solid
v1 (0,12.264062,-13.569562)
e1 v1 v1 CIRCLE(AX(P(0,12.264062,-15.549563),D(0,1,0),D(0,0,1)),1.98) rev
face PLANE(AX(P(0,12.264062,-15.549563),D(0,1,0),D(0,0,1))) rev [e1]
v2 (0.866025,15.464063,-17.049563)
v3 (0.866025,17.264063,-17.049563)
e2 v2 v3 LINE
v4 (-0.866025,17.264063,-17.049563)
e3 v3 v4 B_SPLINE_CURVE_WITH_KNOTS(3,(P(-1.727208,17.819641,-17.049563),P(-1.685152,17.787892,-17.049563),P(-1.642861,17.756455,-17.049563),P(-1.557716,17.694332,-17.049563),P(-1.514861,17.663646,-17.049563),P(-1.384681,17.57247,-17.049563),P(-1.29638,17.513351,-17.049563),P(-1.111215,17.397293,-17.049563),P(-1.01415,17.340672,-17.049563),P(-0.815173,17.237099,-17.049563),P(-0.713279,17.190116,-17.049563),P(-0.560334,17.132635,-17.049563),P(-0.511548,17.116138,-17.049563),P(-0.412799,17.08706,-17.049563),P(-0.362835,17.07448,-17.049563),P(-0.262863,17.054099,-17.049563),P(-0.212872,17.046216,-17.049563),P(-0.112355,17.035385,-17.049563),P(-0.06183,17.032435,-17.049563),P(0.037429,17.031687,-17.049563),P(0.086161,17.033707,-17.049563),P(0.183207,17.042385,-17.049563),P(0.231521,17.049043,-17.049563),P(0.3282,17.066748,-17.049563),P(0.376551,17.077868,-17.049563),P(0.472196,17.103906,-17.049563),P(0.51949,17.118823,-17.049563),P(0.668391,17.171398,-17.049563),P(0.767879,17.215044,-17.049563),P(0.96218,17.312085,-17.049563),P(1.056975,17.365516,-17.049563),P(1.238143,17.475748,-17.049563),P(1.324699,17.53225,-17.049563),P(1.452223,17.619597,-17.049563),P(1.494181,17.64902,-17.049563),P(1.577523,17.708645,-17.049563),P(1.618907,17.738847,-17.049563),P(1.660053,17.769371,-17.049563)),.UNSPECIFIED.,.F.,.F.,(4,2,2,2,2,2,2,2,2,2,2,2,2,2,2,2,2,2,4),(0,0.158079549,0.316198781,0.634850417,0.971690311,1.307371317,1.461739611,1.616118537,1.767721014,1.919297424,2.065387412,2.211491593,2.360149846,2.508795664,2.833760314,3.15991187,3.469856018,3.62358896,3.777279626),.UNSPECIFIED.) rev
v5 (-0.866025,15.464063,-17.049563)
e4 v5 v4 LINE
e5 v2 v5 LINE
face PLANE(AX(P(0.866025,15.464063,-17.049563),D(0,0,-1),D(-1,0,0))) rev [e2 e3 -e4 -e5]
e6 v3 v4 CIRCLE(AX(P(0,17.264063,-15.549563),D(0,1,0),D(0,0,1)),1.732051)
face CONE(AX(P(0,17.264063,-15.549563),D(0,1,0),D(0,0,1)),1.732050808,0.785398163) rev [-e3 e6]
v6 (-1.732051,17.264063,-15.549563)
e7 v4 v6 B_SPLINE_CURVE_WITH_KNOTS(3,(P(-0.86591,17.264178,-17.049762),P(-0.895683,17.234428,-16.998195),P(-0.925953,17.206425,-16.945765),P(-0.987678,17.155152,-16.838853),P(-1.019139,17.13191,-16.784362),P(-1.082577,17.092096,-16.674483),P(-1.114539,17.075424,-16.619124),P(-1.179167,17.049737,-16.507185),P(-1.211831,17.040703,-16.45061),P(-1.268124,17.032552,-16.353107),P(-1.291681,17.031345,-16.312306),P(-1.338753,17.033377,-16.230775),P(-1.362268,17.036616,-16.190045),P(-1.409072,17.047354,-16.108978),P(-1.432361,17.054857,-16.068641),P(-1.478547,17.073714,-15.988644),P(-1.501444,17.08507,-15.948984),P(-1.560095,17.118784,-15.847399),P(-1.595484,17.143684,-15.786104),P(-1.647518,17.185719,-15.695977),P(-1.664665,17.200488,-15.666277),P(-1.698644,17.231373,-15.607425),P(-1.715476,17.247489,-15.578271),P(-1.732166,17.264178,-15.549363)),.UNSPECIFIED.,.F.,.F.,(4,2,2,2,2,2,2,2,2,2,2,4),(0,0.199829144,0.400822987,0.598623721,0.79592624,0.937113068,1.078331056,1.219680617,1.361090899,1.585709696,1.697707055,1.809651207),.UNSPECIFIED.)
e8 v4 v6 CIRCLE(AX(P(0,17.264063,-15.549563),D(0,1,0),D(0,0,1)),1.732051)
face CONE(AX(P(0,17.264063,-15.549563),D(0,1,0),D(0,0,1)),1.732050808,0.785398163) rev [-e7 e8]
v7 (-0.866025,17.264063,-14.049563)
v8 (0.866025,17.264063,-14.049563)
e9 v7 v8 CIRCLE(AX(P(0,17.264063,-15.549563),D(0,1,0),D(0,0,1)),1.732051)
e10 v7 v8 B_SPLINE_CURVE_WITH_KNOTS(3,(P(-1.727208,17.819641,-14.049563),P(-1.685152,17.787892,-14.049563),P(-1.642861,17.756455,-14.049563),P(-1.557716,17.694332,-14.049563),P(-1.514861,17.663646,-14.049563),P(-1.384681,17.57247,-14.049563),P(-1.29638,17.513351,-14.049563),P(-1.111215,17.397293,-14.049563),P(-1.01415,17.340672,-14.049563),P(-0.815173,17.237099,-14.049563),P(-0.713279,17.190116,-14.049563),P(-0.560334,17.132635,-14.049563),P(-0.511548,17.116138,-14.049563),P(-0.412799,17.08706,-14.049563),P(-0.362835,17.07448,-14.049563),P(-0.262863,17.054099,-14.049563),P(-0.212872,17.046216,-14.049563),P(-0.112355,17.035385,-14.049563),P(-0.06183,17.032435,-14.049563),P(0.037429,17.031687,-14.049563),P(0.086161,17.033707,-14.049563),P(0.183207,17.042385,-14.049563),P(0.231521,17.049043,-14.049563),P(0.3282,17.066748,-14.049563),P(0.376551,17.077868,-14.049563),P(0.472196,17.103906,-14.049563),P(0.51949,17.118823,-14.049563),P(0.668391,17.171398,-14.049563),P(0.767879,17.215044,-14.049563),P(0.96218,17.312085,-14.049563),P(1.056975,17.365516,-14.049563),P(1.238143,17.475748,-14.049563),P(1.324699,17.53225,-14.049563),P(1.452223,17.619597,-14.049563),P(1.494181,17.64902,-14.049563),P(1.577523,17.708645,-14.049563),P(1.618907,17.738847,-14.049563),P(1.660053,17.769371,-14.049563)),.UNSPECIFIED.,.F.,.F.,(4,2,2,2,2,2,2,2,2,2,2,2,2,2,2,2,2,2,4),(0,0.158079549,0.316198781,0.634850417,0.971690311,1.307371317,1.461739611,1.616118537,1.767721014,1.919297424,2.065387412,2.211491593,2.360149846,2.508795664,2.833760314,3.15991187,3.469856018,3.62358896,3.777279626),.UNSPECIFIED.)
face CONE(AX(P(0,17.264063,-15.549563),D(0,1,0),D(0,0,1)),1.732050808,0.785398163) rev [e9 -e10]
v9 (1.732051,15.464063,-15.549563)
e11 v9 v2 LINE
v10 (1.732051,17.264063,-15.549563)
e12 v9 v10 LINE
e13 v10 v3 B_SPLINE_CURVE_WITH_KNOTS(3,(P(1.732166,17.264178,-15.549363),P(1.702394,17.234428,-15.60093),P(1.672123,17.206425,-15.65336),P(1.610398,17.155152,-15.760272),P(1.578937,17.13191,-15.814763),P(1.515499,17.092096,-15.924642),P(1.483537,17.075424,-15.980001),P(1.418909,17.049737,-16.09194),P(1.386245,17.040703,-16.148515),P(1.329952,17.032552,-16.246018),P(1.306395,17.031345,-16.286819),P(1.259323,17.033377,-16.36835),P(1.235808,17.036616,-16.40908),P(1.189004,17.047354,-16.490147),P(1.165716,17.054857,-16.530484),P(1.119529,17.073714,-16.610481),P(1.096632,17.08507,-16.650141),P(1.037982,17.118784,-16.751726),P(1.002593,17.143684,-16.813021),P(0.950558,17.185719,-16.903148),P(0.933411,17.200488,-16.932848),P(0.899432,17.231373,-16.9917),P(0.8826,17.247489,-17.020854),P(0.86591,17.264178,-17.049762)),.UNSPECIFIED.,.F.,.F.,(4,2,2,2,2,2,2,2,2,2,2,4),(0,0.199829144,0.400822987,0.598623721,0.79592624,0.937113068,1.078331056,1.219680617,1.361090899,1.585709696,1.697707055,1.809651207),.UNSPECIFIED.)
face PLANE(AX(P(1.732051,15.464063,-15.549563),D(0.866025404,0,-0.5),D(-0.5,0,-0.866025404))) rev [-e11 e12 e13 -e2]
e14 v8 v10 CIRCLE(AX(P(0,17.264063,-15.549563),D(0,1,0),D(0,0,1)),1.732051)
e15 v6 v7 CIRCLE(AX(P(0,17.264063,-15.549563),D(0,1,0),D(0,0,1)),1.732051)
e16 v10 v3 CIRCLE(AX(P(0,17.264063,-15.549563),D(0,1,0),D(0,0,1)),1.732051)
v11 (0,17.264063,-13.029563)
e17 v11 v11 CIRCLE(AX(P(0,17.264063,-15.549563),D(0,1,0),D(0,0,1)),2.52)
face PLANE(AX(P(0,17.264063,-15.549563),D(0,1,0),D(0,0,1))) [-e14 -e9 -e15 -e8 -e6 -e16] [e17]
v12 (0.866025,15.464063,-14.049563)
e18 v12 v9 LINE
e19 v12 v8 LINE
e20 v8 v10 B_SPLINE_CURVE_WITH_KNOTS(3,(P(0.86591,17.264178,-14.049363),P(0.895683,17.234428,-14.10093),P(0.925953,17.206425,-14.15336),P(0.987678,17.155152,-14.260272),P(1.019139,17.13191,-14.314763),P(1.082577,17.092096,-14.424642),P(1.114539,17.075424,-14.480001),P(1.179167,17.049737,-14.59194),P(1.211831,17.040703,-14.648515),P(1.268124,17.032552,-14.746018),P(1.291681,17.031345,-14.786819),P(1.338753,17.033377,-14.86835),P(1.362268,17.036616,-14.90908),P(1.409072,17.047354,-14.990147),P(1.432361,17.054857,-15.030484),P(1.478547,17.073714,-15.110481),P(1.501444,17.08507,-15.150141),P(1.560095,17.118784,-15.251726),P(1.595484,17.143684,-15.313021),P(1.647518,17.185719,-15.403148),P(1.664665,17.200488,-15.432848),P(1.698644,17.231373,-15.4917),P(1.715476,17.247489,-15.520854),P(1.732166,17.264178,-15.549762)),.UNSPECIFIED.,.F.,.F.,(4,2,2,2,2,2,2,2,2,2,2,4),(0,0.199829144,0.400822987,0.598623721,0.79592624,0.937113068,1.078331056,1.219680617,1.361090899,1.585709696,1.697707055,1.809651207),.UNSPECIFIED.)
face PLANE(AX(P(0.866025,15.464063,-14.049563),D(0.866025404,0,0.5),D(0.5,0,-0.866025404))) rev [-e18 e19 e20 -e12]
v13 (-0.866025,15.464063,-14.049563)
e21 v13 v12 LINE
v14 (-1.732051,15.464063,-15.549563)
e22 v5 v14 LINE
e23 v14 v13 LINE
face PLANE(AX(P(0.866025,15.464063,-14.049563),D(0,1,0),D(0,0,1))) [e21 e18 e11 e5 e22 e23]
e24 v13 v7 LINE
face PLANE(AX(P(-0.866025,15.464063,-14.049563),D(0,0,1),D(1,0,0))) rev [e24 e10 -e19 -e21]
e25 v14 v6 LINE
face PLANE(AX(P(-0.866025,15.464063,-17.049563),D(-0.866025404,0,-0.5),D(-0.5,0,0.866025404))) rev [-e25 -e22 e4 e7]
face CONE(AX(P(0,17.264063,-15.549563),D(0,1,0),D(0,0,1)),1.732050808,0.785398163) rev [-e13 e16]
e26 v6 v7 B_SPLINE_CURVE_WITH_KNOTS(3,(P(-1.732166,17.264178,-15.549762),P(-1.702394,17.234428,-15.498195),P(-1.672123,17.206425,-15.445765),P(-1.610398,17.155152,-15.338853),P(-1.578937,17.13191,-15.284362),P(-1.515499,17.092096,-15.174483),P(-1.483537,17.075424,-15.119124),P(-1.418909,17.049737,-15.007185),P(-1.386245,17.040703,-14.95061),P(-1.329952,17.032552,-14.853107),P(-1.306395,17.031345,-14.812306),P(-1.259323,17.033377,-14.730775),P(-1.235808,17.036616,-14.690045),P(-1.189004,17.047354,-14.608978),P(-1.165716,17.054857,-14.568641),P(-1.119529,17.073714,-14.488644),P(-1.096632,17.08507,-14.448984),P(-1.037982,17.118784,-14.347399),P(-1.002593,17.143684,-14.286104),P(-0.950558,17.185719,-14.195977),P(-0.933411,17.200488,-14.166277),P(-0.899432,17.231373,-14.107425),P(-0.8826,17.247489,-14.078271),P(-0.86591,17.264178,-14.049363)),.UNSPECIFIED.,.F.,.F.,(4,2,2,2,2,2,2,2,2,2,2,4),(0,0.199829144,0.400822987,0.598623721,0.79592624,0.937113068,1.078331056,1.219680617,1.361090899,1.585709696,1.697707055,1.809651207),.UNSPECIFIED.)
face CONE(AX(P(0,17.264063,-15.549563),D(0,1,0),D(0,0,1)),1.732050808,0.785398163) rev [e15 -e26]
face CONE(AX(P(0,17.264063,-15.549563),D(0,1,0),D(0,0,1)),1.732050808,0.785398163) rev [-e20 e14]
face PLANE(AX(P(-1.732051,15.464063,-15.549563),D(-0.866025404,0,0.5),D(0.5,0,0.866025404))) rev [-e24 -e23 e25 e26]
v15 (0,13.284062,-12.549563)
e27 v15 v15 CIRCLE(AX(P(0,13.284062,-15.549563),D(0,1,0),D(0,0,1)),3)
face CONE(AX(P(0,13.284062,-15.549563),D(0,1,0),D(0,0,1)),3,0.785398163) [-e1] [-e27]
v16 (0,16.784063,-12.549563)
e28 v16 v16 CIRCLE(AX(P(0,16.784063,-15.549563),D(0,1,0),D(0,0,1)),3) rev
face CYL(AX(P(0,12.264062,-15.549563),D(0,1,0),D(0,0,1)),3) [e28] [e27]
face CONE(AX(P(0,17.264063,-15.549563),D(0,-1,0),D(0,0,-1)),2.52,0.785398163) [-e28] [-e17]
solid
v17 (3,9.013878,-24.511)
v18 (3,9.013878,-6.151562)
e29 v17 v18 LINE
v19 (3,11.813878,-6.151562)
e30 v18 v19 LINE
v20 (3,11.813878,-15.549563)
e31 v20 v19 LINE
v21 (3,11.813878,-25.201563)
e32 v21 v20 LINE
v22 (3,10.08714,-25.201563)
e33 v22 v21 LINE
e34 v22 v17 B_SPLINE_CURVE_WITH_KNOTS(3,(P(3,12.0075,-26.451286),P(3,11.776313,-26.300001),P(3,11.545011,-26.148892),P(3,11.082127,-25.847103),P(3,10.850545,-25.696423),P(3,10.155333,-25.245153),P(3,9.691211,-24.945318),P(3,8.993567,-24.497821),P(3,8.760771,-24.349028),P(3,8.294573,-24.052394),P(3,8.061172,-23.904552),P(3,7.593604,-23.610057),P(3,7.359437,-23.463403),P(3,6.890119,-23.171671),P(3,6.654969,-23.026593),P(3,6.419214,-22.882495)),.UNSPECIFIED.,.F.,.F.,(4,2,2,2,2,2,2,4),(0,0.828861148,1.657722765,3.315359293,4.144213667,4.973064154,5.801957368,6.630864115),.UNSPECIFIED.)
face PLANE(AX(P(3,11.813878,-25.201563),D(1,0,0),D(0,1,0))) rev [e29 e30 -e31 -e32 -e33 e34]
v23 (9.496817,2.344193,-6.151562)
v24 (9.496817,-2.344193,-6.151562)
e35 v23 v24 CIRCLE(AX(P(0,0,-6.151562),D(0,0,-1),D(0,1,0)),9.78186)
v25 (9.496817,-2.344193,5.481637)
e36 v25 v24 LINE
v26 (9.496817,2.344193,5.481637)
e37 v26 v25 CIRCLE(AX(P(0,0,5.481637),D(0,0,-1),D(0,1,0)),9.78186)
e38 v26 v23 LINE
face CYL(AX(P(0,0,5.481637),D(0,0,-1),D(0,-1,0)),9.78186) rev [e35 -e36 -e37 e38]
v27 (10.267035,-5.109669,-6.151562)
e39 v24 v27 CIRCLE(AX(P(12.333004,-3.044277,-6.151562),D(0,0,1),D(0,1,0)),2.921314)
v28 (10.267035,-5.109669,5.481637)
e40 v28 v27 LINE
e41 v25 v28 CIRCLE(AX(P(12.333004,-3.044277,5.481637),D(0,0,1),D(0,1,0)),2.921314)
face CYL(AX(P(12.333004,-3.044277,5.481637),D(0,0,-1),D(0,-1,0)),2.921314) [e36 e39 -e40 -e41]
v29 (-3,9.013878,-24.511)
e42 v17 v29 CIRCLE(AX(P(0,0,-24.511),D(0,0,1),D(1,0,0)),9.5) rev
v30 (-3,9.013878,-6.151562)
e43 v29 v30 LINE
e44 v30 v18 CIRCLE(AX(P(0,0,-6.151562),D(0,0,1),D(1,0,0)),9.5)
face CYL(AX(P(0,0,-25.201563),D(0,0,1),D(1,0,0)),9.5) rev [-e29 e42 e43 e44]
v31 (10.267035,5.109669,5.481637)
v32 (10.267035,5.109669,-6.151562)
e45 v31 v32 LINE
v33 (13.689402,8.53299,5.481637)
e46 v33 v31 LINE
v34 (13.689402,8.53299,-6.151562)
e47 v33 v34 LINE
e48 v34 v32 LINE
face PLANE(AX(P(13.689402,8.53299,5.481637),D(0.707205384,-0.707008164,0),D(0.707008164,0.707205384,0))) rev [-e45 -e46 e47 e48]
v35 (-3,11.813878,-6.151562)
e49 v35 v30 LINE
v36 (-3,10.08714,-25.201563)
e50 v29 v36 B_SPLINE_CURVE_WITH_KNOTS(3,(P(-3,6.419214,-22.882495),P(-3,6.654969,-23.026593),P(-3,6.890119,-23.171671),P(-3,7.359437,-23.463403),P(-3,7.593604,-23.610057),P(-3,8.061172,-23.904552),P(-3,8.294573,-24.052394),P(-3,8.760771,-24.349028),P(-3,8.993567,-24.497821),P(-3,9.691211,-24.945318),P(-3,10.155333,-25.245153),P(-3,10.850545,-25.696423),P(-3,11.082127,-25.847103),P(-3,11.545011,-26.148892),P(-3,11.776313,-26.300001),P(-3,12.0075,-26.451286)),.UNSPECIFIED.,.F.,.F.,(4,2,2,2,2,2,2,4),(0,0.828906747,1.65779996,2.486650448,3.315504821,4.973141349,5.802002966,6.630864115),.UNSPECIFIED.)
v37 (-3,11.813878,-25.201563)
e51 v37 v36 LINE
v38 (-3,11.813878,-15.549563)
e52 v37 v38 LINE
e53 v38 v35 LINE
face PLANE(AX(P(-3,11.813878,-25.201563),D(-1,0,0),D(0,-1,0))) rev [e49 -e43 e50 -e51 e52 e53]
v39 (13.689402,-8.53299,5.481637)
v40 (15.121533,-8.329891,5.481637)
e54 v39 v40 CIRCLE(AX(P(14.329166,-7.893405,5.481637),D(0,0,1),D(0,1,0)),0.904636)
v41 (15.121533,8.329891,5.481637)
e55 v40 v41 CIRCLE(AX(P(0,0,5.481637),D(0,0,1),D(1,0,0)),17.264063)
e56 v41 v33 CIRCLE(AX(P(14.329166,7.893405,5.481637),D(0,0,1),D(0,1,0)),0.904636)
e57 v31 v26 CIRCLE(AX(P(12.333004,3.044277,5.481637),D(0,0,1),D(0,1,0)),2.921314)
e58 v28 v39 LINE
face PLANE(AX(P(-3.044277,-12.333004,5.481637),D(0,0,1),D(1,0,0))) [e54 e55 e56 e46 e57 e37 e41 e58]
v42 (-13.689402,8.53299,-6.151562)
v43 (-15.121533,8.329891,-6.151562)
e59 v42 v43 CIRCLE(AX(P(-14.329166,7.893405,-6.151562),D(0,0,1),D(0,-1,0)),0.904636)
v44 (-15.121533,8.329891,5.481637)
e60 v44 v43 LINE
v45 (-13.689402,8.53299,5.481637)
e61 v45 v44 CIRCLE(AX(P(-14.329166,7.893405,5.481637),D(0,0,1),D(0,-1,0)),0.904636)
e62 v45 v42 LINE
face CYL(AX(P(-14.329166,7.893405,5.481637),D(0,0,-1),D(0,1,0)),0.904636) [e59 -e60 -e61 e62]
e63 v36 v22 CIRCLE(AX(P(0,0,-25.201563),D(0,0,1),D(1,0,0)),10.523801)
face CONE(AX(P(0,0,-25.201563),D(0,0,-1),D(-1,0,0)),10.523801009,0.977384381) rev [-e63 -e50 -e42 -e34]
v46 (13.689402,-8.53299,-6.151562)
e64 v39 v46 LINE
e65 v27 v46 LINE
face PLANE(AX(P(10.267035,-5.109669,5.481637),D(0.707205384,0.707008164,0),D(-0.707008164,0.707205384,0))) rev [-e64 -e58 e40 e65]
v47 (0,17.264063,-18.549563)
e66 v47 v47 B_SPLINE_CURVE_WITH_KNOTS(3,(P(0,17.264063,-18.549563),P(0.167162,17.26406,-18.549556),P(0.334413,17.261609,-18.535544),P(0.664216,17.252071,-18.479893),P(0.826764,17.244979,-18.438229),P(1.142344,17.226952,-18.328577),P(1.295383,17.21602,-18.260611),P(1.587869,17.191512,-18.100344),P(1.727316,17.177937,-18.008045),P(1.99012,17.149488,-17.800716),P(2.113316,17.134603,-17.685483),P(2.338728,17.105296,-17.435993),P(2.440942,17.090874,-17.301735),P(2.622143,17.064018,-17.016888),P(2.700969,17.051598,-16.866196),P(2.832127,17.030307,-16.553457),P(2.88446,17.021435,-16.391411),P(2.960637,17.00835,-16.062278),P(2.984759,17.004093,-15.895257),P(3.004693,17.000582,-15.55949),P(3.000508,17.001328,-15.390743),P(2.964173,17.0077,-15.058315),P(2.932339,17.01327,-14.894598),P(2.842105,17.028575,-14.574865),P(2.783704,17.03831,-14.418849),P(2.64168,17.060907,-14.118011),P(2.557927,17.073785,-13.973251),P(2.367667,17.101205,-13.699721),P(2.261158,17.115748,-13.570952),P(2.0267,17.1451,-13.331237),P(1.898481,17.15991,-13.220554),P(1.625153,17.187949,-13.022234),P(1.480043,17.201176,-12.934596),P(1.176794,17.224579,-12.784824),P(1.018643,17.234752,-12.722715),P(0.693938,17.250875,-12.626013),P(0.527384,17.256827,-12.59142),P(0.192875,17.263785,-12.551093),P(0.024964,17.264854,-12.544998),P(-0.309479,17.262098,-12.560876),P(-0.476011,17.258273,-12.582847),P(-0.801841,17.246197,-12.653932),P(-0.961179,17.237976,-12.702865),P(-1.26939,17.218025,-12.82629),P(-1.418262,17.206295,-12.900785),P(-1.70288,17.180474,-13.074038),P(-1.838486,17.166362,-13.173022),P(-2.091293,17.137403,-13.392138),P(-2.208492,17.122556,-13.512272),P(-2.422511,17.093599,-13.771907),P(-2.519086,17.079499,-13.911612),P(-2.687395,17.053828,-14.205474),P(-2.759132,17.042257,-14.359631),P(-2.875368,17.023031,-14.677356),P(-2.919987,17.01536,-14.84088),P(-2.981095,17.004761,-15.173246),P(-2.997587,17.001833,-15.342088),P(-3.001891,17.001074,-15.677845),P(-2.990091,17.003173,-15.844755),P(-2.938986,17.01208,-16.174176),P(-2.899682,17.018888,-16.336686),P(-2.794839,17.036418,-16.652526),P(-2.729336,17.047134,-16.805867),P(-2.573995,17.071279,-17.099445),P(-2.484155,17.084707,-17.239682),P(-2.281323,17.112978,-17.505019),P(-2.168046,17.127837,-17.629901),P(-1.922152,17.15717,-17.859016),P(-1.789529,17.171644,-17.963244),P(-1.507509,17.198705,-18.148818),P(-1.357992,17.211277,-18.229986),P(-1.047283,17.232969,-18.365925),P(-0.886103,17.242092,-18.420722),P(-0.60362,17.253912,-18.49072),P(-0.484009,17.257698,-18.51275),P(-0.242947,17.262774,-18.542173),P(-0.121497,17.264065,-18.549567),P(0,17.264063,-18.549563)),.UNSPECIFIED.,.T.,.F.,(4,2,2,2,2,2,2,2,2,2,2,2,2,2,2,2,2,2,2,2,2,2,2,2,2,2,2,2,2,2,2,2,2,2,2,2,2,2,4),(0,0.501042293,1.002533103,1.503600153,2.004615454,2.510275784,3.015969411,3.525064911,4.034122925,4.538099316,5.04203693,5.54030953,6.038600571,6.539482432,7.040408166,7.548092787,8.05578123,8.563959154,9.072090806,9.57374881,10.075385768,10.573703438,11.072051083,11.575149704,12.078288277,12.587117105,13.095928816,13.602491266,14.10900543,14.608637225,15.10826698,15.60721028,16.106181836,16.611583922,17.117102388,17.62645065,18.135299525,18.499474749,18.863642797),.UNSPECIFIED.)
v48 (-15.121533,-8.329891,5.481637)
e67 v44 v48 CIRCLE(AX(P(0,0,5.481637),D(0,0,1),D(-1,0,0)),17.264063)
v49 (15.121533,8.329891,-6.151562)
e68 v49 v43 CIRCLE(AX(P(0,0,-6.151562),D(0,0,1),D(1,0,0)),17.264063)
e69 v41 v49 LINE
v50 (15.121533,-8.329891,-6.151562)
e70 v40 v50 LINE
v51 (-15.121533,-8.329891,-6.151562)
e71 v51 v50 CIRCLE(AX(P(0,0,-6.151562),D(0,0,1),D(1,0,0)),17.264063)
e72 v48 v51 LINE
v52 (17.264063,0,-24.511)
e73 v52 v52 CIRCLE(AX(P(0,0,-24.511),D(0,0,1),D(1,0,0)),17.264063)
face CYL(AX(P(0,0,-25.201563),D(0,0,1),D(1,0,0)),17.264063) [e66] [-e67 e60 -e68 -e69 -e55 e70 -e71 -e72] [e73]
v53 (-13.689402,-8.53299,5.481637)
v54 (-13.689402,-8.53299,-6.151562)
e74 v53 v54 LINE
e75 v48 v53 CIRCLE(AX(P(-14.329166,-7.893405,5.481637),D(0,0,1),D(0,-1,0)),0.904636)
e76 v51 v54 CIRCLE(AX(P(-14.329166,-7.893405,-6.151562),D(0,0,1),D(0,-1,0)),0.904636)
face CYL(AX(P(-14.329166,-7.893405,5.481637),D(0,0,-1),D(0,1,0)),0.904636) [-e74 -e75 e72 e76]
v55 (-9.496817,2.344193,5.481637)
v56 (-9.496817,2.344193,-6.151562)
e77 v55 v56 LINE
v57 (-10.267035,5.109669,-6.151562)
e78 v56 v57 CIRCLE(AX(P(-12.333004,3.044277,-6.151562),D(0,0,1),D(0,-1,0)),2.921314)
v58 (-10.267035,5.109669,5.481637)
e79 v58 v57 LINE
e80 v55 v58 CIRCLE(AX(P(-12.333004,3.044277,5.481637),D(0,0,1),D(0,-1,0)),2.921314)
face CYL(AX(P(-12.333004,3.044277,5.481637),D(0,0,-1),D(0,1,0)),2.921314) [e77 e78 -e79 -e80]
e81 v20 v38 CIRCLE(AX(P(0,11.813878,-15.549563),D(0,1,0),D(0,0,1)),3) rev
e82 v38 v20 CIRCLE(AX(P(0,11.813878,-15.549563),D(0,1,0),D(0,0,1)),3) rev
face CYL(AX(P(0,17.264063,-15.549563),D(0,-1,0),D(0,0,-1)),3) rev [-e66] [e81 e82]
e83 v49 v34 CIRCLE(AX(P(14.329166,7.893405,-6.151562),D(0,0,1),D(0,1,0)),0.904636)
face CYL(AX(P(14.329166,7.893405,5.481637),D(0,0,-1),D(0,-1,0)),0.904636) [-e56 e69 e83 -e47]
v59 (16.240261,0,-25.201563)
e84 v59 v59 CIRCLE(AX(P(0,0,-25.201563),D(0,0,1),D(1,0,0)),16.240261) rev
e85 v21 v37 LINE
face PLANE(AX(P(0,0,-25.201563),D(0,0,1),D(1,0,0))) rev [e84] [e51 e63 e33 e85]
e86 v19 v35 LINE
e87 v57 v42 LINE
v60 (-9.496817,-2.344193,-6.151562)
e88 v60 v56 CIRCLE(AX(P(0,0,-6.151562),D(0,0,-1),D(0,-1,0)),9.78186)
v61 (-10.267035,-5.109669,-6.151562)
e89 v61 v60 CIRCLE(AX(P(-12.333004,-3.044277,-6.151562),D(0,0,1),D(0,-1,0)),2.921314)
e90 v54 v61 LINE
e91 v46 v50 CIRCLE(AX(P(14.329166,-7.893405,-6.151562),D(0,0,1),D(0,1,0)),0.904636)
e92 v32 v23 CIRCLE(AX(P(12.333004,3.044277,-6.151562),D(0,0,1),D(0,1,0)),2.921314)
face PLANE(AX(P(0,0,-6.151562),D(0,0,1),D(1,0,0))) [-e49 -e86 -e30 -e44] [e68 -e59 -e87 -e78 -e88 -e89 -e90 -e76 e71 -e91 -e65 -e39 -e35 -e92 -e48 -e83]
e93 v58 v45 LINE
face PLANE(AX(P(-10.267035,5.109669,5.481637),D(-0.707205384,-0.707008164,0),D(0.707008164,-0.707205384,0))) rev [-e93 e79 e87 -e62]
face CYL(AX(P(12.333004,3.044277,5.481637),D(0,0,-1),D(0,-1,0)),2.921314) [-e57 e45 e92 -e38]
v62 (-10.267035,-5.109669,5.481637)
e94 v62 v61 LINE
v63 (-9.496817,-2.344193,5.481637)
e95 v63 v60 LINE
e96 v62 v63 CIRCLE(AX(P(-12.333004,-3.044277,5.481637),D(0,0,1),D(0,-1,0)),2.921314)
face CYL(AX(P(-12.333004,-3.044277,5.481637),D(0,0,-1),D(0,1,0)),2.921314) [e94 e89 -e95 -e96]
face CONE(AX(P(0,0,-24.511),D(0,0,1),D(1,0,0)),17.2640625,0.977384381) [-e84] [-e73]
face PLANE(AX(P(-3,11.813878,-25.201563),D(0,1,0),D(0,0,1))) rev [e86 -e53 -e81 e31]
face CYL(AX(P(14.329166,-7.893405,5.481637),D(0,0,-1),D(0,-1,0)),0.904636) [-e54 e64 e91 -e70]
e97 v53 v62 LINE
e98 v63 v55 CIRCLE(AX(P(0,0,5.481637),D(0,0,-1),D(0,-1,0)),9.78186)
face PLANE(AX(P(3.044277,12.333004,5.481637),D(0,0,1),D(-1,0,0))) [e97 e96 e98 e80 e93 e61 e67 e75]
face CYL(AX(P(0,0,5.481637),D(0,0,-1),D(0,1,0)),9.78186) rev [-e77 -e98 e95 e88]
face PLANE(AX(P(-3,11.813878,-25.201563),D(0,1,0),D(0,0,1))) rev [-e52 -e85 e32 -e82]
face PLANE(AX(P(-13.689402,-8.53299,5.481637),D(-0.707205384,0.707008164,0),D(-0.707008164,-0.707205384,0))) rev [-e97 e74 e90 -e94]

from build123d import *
from OCP.BRepFilletAPI import BRepFilletAPI_MakeChamfer
from build123d.topology import SkipClean

# Parameters (mm, degrees)
BOSS_EXTRUDE1_START     = -6.151562
SKETCH1_R               = 17.264063
BOSS_EXTRUDE1_DEPTH     = 19.050001
BOSS_EXTRUDE6_START     = 11.6332
BOSS_EXTRUDE6_DEPTH     = 11.6332
MOVE_START              = -6.151562
MOVE_FACE2_DEPTH        = 11.6332
MOVE_FACE2_2_DEPTH      = 11.6332
CIRPATTERN4_START       = -6.151562
CIRPATTERN4_DEPTH       = 11.6332
CUT_EXTRUDE5_DEPTH      = 36.088666
CUT_EXTRUDE5_DEPTH_BACK = 36.088666
SKETCH15_R              = 9.5
CHAMFER1_SIZE           = 0.690562
CHAMFER1_SIZE2          = 1.023801
CUT_EXTRUDE1_DEPTH      = 36.088666
CUT_EXTRUDE1_DEPTH_BACK = 36.088666
SKETCH5_R               = 3
CUT_EXTRUDE2_DEPTH      = 36.088666
SKETCH6_R               = 3
BOSS_EXTRUDE3_DEPTH     = 5
CUT_EXTRUDE3_DEPTH      = 1.8
CHAMFER3_SIZE           = 0.48
CHAMFER4_SIZE           = 1.02


# Read off the part's stored shape, not the designer's step: Move Face2, CirPattern4
with BuildPart() as part:
    # Sketch1 → Boss-Extrude1 (new body)
    with BuildSketch(Plane.XY.offset(BOSS_EXTRUDE1_START)):
        Circle(SKETCH1_R)
    extrude(amount=-BOSS_EXTRUDE1_DEPTH)

    # Sketch12 → Boss-Extrude6 (add)
    with SkipClean():  # the faces are left unmerged after this step: merging them gives an invalid solid
        with BuildSketch(Plane.XY.offset(-6.151562).offset(BOSS_EXTRUDE6_START)):
            with BuildLine():
                Line((-5.109669, -10.267035), (-8.53299, -13.689402))
                ThreePointArc((-8.53299, -13.689402), (-8.789079, -14.456186), (-8.329891, -15.121533))
                ThreePointArc((-8.329891, -15.121533), (0, -17.264062), (8.329891, -15.121533))
                ThreePointArc((8.329891, -15.121533), (8.789079, -14.456186), (8.53299, -13.689402))
                Line((8.53299, -13.689402), (5.109669, -10.267035))
                ThreePointArc((5.109669, -10.267035), (3.828066, -9.5188), (2.344193, -9.496817))
                ThreePointArc((2.344193, -9.496817), (0, -9.78186), (-2.344193, -9.496817))
                ThreePointArc((-2.344193, -9.496817), (-3.828066, -9.5188), (-5.109669, -10.267035))
            make_face()
        extrude(amount=-BOSS_EXTRUDE6_DEPTH)

    # Move Face2 outline → Move Face2 (cut)
    with BuildSketch(Plane.XY.offset(MOVE_START)):
        with BuildLine():
            ThreePointArc((-8.329891, -15.121533), (0, -17.264063), (8.329891, -15.121533))
            ThreePointArc((8.329891, -15.121533), (8.789079, -14.456186), (8.53299, -13.689402))
            Line((8.53299, -13.689402), (5.109669, -10.267035))
            ThreePointArc((5.109669, -10.267035), (3.828066, -9.5188), (2.344193, -9.496817))
            ThreePointArc((2.344193, -9.496817), (0, -9.78186), (-2.344193, -9.496817))
            ThreePointArc((-2.344193, -9.496817), (-3.828066, -9.5188), (-5.109669, -10.267035))
            Line((-5.109669, -10.267035), (-8.53299, -13.689402))
            ThreePointArc((-8.53299, -13.689402), (-8.789079, -14.456186), (-8.329891, -15.121533))
        make_face()
    extrude(amount=MOVE_FACE2_DEPTH, mode=Mode.SUBTRACT)

    # Move Face2 2 outline → Move Face2 2 (add)
    with BuildSketch(Plane.XY.offset(MOVE_START)):
        with BuildLine():
            ThreePointArc((9.496817, -2.344193), (9.5188, -3.828066), (10.267035, -5.109669))
            Line((10.267035, -5.109669), (13.689402, -8.53299))
            ThreePointArc((13.689402, -8.53299), (14.456186, -8.789079), (15.121533, -8.329891))
            ThreePointArc((15.121533, -8.329891), (17.264063, 0), (15.121533, 8.329891))
            ThreePointArc((15.121533, 8.329891), (14.456186, 8.789079), (13.689402, 8.53299))
            Line((13.689402, 8.53299), (10.267035, 5.109669))
            ThreePointArc((10.267035, 5.109669), (9.5188, 3.828066), (9.496817, 2.344193))
            ThreePointArc((9.496817, 2.344193), (9.78186, 0), (9.496817, -2.344193))
        make_face()
    extrude(amount=MOVE_FACE2_2_DEPTH)

    # CirPattern4 outline → CirPattern4 (add)
    with BuildSketch(Plane.XY.offset(CIRPATTERN4_START)):
        with BuildLine():
            ThreePointArc((-9.496817, 2.344193), (-9.5188, 3.828066), (-10.267035, 5.109669))
            Line((-10.267035, 5.109669), (-13.689402, 8.53299))
            ThreePointArc((-13.689402, 8.53299), (-14.456186, 8.789079), (-15.121533, 8.329891))
            ThreePointArc((-15.121533, 8.329891), (-17.264063, 0), (-15.121533, -8.329891))
            ThreePointArc((-15.121533, -8.329891), (-14.456186, -8.789079), (-13.689402, -8.53299))
            Line((-13.689402, -8.53299), (-10.267035, -5.109669))
            ThreePointArc((-10.267035, -5.109669), (-9.5188, -3.828066), (-9.496817, -2.344193))
            ThreePointArc((-9.496817, -2.344193), (-9.78186, 0), (-9.496817, 2.344193))
        make_face()
    extrude(amount=CIRPATTERN4_DEPTH)

    # Sketch15 → Cut-Extrude5 (cut, two sides: drawn at the far end of the back side and taken through both)
    with BuildSketch(Plane.XY.offset(-CUT_EXTRUDE5_DEPTH_BACK)):
        Circle(SKETCH15_R)
    extrude(amount=CUT_EXTRUDE5_DEPTH + CUT_EXTRUDE5_DEPTH_BACK, mode=Mode.SUBTRACT)

    # Chamfer1: one chamfer whose edges measure the first distance from different faces: ONE call of the kernel's chamfer builder (chamfer() names one face for all edges)
    chamfer1_edges_1 = [part.edges().sort_by_distance(p)[0] for p in [
        (-17.264063, 0, -25.201563),
    ]]
    chamfer1_side_1 = [part.faces().sort_by_distance(p)[0] for p in [
        (-17.264063, 0, -15.676563),
    ]]
    chamfer1_edges_2 = [part.edges().sort_by_distance(p)[0] for p in [
        (-9.5, 0, -25.201563),
    ]]
    chamfer1_side_2 = [part.faces().sort_by_distance(p)[0] for p in [
        (-9.5, 0, -15.676562),
    ]]
    chamfer1 = BRepFilletAPI_MakeChamfer(part.part.solid().wrapped)
    for e in chamfer1_edges_1:
        chamfer1.Add(CHAMFER1_SIZE, CHAMFER1_SIZE2, e.wrapped, chamfer1_side_1[0].wrapped)  # the first distance lies on this face
    for e in chamfer1_edges_2:
        chamfer1.Add(CHAMFER1_SIZE, CHAMFER1_SIZE2, e.wrapped, chamfer1_side_2[0].wrapped)  # the first distance lies on this face
    add(Compound.cast(chamfer1.Shape()), mode=Mode.REPLACE)

    # Sketch4 → Cut-Extrude1 (cut, two sides: drawn at the far end of the back side and taken through both)
    with BuildSketch(Plane.XY.offset(-CUT_EXTRUDE1_DEPTH_BACK)):
        with BuildLine():
            Line((-3, 11.813878), (3, 11.813878))
            Line((3, 11.813878), (3, 9.013878))
            ThreePointArc((3, 9.013878), (0, 9.5), (-3, 9.013878))
            Line((-3, 9.013878), (-3, 11.813878))
        make_face()
    extrude(amount=CUT_EXTRUDE1_DEPTH + CUT_EXTRUDE1_DEPTH_BACK, mode=Mode.SUBTRACT)

    # Sketch5 → Cut-Extrude2 (cut, through all)
    with BuildSketch(Plane(origin=(0, 0, 0), x_dir=(1, 0, 0), z_dir=(0, 1, 0))):
        with Locations(Location((0, 15.549563, 0), (0, 0, 90))):
            Circle(SKETCH5_R)
    extrude(amount=CUT_EXTRUDE2_DEPTH, mode=Mode.SUBTRACT)


with BuildPart() as body_2:
    # Sketch6 → Boss-Extrude3 (new body)
    with BuildSketch(Plane(origin=(0, 17.264063, 0), x_dir=(-1, 0, 0), z_dir=(0, 1, 0))):
        with Locations(Location((0, -15.549563, 0), (0, 0, 90))):
            Circle(SKETCH6_R)
    extrude(amount=-BOSS_EXTRUDE3_DEPTH)

    # Sketch8 → Cut-Extrude3 (cut)
    with BuildSketch(Plane(origin=(0, 17.264063, 0), x_dir=(1, 0, 0), z_dir=(0, 1, 0))):
        Polygon((0.866025, 14.049563), (1.732051, 15.549563), (0.866025, 17.049563), (-0.866025, 17.049563), (-1.732051, 15.549563), (-0.866025, 14.049563), align=None)
    extrude(amount=-CUT_EXTRUDE3_DEPTH, mode=Mode.SUBTRACT)

    # Cut-Extrude4 cone 1 section (through the dimple's axis) → Cut-Extrude4 (revolve, cut)
    with BuildSketch(Plane(origin=(0, 17.264063, -15.549563), x_dir=(0, 0, 1), z_dir=(1, 0, 0))):
        Polygon((0, 0), (1.732051, 0), (0, 1.732051), align=None)
    revolve(axis=Axis((0, 17.264063, -15.549563), (0, -1, 0)), mode=Mode.SUBTRACT)

    # Chamfer3
    chamfer3_edges = [body_2.edges().sort_by_distance(p)[0] for p in [
        (0, 17.264063, -18.549563),
    ]]
    chamfer(chamfer3_edges, length=CHAMFER3_SIZE)

    # Chamfer4
    chamfer4_edges = [body_2.edges().sort_by_distance(p)[0] for p in [
        (0, 12.264063, -18.549563),
    ]]
    chamfer(chamfer4_edges, length=CHAMFER4_SIZE)


solid = Compound([part.part, body_2.part])
